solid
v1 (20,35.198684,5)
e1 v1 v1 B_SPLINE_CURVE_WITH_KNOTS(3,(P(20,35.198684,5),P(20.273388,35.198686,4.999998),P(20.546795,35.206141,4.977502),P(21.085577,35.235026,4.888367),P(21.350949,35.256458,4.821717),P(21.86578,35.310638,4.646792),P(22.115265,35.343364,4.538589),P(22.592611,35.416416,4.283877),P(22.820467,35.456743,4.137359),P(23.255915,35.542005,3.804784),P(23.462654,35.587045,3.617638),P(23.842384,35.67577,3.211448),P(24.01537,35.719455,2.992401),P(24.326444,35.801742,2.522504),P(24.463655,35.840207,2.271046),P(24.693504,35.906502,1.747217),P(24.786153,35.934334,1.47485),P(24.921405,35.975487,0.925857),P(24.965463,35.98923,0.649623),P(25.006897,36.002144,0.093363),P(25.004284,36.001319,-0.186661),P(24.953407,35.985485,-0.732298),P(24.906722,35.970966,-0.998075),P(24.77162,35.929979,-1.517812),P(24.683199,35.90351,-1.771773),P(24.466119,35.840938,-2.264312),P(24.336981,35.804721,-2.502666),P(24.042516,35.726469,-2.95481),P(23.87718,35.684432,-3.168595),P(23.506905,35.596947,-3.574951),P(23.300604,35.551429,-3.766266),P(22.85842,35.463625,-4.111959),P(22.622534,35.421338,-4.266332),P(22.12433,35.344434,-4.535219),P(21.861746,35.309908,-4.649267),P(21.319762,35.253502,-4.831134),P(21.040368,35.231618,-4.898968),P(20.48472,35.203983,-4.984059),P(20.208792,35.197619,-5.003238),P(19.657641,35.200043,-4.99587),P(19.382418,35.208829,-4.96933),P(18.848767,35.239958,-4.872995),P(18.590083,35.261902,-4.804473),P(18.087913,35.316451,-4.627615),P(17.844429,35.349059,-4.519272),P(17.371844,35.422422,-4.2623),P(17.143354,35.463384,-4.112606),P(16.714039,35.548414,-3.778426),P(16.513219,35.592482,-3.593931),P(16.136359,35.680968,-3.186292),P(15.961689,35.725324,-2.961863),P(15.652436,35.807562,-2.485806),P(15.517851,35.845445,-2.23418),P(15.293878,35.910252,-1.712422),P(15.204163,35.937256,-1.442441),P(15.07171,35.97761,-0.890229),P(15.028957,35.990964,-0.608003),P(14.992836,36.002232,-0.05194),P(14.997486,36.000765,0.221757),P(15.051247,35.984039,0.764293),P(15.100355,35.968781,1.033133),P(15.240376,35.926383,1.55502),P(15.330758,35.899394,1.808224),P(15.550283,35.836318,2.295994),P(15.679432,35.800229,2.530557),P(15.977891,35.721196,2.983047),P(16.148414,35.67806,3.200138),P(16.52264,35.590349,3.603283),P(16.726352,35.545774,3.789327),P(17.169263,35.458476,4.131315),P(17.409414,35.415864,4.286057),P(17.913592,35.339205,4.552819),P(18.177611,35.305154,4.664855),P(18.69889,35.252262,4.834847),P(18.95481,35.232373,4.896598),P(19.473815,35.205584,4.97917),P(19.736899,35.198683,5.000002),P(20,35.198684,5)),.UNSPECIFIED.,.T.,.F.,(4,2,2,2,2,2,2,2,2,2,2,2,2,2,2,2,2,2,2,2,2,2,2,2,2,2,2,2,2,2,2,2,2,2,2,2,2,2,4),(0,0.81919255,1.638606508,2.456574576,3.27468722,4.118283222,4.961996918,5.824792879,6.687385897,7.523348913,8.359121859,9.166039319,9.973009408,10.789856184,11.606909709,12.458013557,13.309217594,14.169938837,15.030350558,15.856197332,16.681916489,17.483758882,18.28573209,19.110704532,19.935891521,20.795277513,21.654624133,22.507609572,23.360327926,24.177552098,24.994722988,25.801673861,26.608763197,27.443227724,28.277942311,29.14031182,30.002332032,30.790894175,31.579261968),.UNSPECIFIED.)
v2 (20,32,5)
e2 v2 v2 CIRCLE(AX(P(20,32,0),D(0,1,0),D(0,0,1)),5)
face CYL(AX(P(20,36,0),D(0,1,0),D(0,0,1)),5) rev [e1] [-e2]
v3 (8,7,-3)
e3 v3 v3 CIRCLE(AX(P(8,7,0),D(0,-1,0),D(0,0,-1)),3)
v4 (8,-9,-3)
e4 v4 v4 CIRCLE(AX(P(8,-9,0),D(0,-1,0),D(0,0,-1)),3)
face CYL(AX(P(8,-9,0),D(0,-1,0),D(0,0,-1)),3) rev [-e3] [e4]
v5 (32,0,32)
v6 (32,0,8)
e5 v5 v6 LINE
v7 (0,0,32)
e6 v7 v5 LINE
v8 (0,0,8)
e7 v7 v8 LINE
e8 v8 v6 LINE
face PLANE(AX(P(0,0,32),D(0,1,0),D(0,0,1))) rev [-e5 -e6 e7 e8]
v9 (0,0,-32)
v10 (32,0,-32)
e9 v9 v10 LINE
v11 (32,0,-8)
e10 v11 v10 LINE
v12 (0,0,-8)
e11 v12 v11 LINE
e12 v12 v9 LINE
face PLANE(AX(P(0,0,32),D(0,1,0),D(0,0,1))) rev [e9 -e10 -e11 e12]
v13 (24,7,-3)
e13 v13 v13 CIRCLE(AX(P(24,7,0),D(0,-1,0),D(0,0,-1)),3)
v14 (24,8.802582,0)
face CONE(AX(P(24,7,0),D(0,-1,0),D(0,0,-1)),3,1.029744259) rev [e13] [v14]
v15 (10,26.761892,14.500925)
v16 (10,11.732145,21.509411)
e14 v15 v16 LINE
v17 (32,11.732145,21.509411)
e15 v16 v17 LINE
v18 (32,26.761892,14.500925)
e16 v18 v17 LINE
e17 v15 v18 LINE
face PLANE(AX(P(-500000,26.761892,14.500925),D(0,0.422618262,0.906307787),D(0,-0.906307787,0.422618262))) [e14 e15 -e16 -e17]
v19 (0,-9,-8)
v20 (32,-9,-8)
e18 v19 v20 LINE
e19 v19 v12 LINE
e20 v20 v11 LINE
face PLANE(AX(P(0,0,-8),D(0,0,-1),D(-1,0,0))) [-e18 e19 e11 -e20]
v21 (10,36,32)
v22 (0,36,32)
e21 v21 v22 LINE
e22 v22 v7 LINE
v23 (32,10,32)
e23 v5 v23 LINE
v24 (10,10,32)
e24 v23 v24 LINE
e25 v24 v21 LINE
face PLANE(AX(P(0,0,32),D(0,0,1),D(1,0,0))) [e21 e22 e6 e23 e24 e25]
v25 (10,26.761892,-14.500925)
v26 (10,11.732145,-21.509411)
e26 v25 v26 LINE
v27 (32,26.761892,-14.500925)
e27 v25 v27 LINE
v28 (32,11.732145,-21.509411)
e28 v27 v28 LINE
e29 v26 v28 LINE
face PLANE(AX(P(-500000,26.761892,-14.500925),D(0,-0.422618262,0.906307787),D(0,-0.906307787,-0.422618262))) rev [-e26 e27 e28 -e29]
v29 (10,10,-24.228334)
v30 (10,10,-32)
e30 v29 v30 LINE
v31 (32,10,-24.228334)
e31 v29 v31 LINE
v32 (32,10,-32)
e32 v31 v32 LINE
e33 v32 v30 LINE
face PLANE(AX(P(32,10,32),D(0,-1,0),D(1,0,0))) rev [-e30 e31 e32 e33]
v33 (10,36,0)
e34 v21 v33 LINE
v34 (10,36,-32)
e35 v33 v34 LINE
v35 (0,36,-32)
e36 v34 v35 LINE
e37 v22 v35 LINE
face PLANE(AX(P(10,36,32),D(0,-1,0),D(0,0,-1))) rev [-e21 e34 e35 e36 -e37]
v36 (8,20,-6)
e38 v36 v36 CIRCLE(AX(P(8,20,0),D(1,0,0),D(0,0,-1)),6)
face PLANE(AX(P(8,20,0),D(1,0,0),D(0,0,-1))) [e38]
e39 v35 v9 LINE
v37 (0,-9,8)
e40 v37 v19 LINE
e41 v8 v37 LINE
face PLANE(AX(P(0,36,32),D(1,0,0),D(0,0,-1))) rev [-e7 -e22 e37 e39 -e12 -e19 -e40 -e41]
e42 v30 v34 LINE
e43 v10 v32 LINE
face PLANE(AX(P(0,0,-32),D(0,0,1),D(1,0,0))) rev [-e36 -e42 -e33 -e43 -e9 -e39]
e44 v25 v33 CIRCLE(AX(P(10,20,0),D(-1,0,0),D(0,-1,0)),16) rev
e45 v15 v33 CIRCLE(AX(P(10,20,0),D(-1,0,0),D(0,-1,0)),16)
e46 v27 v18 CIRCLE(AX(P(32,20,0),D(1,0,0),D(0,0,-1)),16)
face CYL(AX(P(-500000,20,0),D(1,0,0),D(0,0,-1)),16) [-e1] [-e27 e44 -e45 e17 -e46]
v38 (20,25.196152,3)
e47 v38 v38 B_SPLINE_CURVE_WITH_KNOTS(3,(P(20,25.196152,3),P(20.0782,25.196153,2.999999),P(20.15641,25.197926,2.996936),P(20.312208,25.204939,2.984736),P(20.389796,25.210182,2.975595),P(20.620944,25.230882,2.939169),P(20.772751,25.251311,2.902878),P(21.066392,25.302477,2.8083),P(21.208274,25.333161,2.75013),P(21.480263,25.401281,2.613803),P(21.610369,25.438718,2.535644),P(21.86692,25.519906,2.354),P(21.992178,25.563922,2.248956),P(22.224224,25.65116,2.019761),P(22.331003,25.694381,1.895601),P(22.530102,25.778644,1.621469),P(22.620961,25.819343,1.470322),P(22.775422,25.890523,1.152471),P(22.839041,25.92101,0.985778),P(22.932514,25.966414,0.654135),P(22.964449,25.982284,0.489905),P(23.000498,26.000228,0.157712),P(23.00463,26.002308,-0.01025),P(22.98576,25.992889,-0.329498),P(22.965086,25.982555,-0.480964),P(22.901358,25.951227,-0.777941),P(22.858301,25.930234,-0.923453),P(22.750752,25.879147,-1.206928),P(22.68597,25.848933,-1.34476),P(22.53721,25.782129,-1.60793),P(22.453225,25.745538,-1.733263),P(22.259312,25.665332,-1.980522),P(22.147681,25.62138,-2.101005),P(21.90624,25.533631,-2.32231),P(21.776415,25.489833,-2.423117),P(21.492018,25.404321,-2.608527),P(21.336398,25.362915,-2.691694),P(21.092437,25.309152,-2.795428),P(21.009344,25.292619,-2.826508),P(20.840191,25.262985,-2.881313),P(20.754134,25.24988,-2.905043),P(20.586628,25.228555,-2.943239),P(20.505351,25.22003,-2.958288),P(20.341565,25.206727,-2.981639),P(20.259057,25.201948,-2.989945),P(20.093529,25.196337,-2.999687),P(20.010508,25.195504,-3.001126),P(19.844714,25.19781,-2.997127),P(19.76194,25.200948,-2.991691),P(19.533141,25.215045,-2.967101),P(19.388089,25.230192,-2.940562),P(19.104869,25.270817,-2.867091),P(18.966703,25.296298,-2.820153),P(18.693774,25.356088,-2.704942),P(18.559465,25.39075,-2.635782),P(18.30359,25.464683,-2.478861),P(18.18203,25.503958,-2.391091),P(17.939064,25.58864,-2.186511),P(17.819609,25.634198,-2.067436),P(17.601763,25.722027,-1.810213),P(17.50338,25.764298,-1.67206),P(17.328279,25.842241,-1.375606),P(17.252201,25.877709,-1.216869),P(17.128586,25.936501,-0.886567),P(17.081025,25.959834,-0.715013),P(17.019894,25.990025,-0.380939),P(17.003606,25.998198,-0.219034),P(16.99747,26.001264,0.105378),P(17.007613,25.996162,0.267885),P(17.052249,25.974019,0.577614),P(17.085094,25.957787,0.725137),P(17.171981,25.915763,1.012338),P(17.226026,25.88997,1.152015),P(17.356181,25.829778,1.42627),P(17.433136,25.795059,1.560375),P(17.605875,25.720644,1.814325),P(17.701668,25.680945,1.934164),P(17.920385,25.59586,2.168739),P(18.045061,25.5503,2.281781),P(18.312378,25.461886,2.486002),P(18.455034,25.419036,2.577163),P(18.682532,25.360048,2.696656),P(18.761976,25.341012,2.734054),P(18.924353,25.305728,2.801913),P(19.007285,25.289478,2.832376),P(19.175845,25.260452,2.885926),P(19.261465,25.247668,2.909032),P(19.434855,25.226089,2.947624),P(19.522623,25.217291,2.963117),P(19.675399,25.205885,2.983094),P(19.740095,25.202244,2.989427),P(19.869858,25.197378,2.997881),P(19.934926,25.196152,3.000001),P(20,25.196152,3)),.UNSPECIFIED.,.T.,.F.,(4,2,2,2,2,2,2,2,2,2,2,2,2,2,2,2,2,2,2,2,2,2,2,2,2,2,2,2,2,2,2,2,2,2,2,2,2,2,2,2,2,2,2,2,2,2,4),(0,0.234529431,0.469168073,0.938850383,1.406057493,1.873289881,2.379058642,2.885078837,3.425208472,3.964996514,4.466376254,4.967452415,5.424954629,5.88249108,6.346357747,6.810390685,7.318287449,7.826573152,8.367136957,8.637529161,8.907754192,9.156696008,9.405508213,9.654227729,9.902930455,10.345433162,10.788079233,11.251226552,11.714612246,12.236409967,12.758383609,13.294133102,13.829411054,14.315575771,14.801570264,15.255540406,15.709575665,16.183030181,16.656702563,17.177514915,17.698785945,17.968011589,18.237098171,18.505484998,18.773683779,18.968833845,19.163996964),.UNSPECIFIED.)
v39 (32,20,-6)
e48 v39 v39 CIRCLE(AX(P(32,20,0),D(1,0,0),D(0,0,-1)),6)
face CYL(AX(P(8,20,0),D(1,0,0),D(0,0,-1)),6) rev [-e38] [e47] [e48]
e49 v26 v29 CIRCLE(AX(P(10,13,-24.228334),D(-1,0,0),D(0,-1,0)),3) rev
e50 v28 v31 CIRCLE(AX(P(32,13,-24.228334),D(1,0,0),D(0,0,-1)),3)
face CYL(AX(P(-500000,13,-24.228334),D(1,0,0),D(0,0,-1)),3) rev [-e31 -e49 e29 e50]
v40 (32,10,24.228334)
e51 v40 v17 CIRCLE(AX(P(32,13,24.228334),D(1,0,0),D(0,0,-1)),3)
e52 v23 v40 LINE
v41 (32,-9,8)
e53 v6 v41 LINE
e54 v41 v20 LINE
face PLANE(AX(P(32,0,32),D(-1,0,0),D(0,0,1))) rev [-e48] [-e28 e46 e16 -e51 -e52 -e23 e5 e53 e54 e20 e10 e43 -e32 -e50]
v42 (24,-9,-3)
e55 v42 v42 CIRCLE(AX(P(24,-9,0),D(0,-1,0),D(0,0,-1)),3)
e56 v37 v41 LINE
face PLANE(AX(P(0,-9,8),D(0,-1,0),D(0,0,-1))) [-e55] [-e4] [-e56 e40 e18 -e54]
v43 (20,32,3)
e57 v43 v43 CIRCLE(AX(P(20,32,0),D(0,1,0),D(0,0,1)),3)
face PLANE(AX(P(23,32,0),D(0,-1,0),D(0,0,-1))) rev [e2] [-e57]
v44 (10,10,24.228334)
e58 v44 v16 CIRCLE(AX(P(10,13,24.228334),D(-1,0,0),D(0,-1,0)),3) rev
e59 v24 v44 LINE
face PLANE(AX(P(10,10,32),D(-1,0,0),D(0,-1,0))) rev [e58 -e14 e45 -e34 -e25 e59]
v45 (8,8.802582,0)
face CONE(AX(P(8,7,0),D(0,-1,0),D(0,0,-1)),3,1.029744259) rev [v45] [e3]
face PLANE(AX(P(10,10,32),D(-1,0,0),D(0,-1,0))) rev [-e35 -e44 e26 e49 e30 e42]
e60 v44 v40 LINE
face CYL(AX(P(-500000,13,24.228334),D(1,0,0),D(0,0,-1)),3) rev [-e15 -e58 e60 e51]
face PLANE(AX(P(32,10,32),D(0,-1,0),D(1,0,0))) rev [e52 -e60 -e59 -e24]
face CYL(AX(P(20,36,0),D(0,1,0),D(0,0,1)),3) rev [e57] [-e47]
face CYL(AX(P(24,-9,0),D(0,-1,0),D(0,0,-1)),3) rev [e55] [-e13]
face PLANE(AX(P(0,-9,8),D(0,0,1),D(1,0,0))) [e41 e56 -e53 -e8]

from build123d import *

# Parameters (mm, degrees)
BOSS_EXTRUDE1_DEPTH       = 32
BOSS_EXTRUDE2_REACH       = 59.827
SKETCH3_4_R               = 6
CUT_EXTRUDE1_DEPTH        = 24
SKETCH4_W                 = 16
SKETCH4_H                 = 9
BOSS_EXTRUDE3_DEPTH       = 32
F_6_0MM_DOWEL_HOLE1_D     = 6
F_6_0MM_DOWEL_HOLE1_DEPTH = 16
F_6_0MM_DOWEL_HOLE1_TIP   = 1.802581857


# Read off the part's stored shape, not the designer's step: CBORE for M5 Hex Head Bolt1
with BuildPart() as part:
    # Sketch1 → Boss-Extrude1 (new, symmetric)
    with BuildSketch(Plane.XY):
        Polygon((0, 36), (0, 0), (32, 0), (32, 10), (10, 10), (10, 36), align=None)
    extrude(amount=BOSS_EXTRUDE1_DEPTH, both=True)

    # Sketch3 → Boss-Extrude2 (add, up to next)
    with BuildSketch(Plane(origin=(32, 0, 0), x_dir=(0, 0, -1), z_dir=(1, 0, 0)), mode=Mode.PRIVATE) as boss_extrude2_sk1:
        with BuildLine():
            Line((14.500924593, 26.761892188), (21.509410706, 11.732145215))
            ThreePointArc((21.509410706, 11.732145215), (22.616435242, 10.469825663), (24.228334067, 10))
            Line((24.228334067, 10), (-24.228334067, 10))
            ThreePointArc((-24.228334067, 10), (-22.616435242, 10.469825663), (-21.509410706, 11.732145215))
            Line((-21.509410706, 11.732145215), (-14.500924593, 26.761892188))
            ThreePointArc((-14.500924593, 26.761892188), (0, 36), (14.500924593, 26.761892188))
        make_face()
    boss_extrude2_tool1 = extrude(boss_extrude2_sk1.sketch, amount=-BOSS_EXTRUDE2_REACH, mode=Mode.PRIVATE) - part.part
    add(boss_extrude2_tool1.solids().sort_by_distance((32, 20.8085, 0))[0])

    # Sketch3<4> → Cut-Extrude1 (cut)
    with BuildSketch(Plane(origin=(32, 0, 0), x_dir=(0, 0, -1), z_dir=(1, 0, 0))):
        with Locations((0, 20)):
            Circle(SKETCH3_4_R)
    extrude(amount=-CUT_EXTRUDE1_DEPTH, mode=Mode.SUBTRACT)

    # Sketch4 → Boss-Extrude3 (add)
    with BuildSketch(Plane(origin=(32, 0, 0), x_dir=(0, 0, -1), z_dir=(1, 0, 0))):
        with Locations((0, -4.5)):
            Rectangle(SKETCH4_W, SKETCH4_H)
    extrude(amount=-BOSS_EXTRUDE3_DEPTH)

    # Ø6.0mm Dowel Hole1
    with Locations(Plane(origin=(0, -9, 0), x_dir=(-1, 0, 0), z_dir=(0, -1, 0))):
        with Locations((-8, 0), (-24, 0)):
            Hole(F_6_0MM_DOWEL_HOLE1_D / 2, depth=F_6_0MM_DOWEL_HOLE1_DEPTH)
            with Locations((0, 0, -(F_6_0MM_DOWEL_HOLE1_DEPTH + F_6_0MM_DOWEL_HOLE1_TIP / 2))):  # 118° drill point
                Cone(0, F_6_0MM_DOWEL_HOLE1_D / 2, F_6_0MM_DOWEL_HOLE1_TIP, mode=Mode.SUBTRACT)

    # CBORE for M5 Hex Head Bolt1 outline → CBORE for M5 Hex Head Bolt1 (revolve, cut)
    with BuildSketch(Plane(origin=(20, 0, 0), x_dir=(1, 0, 0), z_dir=(0, 0, 1))):
        Polygon((0, 25.195854076), (3, 25.195854076), (3, 32), (5, 32), (5, 36.000103319), (0, 36.000103319), align=None)
    revolve(axis=Axis((20, 0, 0), (0, 1, 0)), mode=Mode.SUBTRACT)


solid = part.part
